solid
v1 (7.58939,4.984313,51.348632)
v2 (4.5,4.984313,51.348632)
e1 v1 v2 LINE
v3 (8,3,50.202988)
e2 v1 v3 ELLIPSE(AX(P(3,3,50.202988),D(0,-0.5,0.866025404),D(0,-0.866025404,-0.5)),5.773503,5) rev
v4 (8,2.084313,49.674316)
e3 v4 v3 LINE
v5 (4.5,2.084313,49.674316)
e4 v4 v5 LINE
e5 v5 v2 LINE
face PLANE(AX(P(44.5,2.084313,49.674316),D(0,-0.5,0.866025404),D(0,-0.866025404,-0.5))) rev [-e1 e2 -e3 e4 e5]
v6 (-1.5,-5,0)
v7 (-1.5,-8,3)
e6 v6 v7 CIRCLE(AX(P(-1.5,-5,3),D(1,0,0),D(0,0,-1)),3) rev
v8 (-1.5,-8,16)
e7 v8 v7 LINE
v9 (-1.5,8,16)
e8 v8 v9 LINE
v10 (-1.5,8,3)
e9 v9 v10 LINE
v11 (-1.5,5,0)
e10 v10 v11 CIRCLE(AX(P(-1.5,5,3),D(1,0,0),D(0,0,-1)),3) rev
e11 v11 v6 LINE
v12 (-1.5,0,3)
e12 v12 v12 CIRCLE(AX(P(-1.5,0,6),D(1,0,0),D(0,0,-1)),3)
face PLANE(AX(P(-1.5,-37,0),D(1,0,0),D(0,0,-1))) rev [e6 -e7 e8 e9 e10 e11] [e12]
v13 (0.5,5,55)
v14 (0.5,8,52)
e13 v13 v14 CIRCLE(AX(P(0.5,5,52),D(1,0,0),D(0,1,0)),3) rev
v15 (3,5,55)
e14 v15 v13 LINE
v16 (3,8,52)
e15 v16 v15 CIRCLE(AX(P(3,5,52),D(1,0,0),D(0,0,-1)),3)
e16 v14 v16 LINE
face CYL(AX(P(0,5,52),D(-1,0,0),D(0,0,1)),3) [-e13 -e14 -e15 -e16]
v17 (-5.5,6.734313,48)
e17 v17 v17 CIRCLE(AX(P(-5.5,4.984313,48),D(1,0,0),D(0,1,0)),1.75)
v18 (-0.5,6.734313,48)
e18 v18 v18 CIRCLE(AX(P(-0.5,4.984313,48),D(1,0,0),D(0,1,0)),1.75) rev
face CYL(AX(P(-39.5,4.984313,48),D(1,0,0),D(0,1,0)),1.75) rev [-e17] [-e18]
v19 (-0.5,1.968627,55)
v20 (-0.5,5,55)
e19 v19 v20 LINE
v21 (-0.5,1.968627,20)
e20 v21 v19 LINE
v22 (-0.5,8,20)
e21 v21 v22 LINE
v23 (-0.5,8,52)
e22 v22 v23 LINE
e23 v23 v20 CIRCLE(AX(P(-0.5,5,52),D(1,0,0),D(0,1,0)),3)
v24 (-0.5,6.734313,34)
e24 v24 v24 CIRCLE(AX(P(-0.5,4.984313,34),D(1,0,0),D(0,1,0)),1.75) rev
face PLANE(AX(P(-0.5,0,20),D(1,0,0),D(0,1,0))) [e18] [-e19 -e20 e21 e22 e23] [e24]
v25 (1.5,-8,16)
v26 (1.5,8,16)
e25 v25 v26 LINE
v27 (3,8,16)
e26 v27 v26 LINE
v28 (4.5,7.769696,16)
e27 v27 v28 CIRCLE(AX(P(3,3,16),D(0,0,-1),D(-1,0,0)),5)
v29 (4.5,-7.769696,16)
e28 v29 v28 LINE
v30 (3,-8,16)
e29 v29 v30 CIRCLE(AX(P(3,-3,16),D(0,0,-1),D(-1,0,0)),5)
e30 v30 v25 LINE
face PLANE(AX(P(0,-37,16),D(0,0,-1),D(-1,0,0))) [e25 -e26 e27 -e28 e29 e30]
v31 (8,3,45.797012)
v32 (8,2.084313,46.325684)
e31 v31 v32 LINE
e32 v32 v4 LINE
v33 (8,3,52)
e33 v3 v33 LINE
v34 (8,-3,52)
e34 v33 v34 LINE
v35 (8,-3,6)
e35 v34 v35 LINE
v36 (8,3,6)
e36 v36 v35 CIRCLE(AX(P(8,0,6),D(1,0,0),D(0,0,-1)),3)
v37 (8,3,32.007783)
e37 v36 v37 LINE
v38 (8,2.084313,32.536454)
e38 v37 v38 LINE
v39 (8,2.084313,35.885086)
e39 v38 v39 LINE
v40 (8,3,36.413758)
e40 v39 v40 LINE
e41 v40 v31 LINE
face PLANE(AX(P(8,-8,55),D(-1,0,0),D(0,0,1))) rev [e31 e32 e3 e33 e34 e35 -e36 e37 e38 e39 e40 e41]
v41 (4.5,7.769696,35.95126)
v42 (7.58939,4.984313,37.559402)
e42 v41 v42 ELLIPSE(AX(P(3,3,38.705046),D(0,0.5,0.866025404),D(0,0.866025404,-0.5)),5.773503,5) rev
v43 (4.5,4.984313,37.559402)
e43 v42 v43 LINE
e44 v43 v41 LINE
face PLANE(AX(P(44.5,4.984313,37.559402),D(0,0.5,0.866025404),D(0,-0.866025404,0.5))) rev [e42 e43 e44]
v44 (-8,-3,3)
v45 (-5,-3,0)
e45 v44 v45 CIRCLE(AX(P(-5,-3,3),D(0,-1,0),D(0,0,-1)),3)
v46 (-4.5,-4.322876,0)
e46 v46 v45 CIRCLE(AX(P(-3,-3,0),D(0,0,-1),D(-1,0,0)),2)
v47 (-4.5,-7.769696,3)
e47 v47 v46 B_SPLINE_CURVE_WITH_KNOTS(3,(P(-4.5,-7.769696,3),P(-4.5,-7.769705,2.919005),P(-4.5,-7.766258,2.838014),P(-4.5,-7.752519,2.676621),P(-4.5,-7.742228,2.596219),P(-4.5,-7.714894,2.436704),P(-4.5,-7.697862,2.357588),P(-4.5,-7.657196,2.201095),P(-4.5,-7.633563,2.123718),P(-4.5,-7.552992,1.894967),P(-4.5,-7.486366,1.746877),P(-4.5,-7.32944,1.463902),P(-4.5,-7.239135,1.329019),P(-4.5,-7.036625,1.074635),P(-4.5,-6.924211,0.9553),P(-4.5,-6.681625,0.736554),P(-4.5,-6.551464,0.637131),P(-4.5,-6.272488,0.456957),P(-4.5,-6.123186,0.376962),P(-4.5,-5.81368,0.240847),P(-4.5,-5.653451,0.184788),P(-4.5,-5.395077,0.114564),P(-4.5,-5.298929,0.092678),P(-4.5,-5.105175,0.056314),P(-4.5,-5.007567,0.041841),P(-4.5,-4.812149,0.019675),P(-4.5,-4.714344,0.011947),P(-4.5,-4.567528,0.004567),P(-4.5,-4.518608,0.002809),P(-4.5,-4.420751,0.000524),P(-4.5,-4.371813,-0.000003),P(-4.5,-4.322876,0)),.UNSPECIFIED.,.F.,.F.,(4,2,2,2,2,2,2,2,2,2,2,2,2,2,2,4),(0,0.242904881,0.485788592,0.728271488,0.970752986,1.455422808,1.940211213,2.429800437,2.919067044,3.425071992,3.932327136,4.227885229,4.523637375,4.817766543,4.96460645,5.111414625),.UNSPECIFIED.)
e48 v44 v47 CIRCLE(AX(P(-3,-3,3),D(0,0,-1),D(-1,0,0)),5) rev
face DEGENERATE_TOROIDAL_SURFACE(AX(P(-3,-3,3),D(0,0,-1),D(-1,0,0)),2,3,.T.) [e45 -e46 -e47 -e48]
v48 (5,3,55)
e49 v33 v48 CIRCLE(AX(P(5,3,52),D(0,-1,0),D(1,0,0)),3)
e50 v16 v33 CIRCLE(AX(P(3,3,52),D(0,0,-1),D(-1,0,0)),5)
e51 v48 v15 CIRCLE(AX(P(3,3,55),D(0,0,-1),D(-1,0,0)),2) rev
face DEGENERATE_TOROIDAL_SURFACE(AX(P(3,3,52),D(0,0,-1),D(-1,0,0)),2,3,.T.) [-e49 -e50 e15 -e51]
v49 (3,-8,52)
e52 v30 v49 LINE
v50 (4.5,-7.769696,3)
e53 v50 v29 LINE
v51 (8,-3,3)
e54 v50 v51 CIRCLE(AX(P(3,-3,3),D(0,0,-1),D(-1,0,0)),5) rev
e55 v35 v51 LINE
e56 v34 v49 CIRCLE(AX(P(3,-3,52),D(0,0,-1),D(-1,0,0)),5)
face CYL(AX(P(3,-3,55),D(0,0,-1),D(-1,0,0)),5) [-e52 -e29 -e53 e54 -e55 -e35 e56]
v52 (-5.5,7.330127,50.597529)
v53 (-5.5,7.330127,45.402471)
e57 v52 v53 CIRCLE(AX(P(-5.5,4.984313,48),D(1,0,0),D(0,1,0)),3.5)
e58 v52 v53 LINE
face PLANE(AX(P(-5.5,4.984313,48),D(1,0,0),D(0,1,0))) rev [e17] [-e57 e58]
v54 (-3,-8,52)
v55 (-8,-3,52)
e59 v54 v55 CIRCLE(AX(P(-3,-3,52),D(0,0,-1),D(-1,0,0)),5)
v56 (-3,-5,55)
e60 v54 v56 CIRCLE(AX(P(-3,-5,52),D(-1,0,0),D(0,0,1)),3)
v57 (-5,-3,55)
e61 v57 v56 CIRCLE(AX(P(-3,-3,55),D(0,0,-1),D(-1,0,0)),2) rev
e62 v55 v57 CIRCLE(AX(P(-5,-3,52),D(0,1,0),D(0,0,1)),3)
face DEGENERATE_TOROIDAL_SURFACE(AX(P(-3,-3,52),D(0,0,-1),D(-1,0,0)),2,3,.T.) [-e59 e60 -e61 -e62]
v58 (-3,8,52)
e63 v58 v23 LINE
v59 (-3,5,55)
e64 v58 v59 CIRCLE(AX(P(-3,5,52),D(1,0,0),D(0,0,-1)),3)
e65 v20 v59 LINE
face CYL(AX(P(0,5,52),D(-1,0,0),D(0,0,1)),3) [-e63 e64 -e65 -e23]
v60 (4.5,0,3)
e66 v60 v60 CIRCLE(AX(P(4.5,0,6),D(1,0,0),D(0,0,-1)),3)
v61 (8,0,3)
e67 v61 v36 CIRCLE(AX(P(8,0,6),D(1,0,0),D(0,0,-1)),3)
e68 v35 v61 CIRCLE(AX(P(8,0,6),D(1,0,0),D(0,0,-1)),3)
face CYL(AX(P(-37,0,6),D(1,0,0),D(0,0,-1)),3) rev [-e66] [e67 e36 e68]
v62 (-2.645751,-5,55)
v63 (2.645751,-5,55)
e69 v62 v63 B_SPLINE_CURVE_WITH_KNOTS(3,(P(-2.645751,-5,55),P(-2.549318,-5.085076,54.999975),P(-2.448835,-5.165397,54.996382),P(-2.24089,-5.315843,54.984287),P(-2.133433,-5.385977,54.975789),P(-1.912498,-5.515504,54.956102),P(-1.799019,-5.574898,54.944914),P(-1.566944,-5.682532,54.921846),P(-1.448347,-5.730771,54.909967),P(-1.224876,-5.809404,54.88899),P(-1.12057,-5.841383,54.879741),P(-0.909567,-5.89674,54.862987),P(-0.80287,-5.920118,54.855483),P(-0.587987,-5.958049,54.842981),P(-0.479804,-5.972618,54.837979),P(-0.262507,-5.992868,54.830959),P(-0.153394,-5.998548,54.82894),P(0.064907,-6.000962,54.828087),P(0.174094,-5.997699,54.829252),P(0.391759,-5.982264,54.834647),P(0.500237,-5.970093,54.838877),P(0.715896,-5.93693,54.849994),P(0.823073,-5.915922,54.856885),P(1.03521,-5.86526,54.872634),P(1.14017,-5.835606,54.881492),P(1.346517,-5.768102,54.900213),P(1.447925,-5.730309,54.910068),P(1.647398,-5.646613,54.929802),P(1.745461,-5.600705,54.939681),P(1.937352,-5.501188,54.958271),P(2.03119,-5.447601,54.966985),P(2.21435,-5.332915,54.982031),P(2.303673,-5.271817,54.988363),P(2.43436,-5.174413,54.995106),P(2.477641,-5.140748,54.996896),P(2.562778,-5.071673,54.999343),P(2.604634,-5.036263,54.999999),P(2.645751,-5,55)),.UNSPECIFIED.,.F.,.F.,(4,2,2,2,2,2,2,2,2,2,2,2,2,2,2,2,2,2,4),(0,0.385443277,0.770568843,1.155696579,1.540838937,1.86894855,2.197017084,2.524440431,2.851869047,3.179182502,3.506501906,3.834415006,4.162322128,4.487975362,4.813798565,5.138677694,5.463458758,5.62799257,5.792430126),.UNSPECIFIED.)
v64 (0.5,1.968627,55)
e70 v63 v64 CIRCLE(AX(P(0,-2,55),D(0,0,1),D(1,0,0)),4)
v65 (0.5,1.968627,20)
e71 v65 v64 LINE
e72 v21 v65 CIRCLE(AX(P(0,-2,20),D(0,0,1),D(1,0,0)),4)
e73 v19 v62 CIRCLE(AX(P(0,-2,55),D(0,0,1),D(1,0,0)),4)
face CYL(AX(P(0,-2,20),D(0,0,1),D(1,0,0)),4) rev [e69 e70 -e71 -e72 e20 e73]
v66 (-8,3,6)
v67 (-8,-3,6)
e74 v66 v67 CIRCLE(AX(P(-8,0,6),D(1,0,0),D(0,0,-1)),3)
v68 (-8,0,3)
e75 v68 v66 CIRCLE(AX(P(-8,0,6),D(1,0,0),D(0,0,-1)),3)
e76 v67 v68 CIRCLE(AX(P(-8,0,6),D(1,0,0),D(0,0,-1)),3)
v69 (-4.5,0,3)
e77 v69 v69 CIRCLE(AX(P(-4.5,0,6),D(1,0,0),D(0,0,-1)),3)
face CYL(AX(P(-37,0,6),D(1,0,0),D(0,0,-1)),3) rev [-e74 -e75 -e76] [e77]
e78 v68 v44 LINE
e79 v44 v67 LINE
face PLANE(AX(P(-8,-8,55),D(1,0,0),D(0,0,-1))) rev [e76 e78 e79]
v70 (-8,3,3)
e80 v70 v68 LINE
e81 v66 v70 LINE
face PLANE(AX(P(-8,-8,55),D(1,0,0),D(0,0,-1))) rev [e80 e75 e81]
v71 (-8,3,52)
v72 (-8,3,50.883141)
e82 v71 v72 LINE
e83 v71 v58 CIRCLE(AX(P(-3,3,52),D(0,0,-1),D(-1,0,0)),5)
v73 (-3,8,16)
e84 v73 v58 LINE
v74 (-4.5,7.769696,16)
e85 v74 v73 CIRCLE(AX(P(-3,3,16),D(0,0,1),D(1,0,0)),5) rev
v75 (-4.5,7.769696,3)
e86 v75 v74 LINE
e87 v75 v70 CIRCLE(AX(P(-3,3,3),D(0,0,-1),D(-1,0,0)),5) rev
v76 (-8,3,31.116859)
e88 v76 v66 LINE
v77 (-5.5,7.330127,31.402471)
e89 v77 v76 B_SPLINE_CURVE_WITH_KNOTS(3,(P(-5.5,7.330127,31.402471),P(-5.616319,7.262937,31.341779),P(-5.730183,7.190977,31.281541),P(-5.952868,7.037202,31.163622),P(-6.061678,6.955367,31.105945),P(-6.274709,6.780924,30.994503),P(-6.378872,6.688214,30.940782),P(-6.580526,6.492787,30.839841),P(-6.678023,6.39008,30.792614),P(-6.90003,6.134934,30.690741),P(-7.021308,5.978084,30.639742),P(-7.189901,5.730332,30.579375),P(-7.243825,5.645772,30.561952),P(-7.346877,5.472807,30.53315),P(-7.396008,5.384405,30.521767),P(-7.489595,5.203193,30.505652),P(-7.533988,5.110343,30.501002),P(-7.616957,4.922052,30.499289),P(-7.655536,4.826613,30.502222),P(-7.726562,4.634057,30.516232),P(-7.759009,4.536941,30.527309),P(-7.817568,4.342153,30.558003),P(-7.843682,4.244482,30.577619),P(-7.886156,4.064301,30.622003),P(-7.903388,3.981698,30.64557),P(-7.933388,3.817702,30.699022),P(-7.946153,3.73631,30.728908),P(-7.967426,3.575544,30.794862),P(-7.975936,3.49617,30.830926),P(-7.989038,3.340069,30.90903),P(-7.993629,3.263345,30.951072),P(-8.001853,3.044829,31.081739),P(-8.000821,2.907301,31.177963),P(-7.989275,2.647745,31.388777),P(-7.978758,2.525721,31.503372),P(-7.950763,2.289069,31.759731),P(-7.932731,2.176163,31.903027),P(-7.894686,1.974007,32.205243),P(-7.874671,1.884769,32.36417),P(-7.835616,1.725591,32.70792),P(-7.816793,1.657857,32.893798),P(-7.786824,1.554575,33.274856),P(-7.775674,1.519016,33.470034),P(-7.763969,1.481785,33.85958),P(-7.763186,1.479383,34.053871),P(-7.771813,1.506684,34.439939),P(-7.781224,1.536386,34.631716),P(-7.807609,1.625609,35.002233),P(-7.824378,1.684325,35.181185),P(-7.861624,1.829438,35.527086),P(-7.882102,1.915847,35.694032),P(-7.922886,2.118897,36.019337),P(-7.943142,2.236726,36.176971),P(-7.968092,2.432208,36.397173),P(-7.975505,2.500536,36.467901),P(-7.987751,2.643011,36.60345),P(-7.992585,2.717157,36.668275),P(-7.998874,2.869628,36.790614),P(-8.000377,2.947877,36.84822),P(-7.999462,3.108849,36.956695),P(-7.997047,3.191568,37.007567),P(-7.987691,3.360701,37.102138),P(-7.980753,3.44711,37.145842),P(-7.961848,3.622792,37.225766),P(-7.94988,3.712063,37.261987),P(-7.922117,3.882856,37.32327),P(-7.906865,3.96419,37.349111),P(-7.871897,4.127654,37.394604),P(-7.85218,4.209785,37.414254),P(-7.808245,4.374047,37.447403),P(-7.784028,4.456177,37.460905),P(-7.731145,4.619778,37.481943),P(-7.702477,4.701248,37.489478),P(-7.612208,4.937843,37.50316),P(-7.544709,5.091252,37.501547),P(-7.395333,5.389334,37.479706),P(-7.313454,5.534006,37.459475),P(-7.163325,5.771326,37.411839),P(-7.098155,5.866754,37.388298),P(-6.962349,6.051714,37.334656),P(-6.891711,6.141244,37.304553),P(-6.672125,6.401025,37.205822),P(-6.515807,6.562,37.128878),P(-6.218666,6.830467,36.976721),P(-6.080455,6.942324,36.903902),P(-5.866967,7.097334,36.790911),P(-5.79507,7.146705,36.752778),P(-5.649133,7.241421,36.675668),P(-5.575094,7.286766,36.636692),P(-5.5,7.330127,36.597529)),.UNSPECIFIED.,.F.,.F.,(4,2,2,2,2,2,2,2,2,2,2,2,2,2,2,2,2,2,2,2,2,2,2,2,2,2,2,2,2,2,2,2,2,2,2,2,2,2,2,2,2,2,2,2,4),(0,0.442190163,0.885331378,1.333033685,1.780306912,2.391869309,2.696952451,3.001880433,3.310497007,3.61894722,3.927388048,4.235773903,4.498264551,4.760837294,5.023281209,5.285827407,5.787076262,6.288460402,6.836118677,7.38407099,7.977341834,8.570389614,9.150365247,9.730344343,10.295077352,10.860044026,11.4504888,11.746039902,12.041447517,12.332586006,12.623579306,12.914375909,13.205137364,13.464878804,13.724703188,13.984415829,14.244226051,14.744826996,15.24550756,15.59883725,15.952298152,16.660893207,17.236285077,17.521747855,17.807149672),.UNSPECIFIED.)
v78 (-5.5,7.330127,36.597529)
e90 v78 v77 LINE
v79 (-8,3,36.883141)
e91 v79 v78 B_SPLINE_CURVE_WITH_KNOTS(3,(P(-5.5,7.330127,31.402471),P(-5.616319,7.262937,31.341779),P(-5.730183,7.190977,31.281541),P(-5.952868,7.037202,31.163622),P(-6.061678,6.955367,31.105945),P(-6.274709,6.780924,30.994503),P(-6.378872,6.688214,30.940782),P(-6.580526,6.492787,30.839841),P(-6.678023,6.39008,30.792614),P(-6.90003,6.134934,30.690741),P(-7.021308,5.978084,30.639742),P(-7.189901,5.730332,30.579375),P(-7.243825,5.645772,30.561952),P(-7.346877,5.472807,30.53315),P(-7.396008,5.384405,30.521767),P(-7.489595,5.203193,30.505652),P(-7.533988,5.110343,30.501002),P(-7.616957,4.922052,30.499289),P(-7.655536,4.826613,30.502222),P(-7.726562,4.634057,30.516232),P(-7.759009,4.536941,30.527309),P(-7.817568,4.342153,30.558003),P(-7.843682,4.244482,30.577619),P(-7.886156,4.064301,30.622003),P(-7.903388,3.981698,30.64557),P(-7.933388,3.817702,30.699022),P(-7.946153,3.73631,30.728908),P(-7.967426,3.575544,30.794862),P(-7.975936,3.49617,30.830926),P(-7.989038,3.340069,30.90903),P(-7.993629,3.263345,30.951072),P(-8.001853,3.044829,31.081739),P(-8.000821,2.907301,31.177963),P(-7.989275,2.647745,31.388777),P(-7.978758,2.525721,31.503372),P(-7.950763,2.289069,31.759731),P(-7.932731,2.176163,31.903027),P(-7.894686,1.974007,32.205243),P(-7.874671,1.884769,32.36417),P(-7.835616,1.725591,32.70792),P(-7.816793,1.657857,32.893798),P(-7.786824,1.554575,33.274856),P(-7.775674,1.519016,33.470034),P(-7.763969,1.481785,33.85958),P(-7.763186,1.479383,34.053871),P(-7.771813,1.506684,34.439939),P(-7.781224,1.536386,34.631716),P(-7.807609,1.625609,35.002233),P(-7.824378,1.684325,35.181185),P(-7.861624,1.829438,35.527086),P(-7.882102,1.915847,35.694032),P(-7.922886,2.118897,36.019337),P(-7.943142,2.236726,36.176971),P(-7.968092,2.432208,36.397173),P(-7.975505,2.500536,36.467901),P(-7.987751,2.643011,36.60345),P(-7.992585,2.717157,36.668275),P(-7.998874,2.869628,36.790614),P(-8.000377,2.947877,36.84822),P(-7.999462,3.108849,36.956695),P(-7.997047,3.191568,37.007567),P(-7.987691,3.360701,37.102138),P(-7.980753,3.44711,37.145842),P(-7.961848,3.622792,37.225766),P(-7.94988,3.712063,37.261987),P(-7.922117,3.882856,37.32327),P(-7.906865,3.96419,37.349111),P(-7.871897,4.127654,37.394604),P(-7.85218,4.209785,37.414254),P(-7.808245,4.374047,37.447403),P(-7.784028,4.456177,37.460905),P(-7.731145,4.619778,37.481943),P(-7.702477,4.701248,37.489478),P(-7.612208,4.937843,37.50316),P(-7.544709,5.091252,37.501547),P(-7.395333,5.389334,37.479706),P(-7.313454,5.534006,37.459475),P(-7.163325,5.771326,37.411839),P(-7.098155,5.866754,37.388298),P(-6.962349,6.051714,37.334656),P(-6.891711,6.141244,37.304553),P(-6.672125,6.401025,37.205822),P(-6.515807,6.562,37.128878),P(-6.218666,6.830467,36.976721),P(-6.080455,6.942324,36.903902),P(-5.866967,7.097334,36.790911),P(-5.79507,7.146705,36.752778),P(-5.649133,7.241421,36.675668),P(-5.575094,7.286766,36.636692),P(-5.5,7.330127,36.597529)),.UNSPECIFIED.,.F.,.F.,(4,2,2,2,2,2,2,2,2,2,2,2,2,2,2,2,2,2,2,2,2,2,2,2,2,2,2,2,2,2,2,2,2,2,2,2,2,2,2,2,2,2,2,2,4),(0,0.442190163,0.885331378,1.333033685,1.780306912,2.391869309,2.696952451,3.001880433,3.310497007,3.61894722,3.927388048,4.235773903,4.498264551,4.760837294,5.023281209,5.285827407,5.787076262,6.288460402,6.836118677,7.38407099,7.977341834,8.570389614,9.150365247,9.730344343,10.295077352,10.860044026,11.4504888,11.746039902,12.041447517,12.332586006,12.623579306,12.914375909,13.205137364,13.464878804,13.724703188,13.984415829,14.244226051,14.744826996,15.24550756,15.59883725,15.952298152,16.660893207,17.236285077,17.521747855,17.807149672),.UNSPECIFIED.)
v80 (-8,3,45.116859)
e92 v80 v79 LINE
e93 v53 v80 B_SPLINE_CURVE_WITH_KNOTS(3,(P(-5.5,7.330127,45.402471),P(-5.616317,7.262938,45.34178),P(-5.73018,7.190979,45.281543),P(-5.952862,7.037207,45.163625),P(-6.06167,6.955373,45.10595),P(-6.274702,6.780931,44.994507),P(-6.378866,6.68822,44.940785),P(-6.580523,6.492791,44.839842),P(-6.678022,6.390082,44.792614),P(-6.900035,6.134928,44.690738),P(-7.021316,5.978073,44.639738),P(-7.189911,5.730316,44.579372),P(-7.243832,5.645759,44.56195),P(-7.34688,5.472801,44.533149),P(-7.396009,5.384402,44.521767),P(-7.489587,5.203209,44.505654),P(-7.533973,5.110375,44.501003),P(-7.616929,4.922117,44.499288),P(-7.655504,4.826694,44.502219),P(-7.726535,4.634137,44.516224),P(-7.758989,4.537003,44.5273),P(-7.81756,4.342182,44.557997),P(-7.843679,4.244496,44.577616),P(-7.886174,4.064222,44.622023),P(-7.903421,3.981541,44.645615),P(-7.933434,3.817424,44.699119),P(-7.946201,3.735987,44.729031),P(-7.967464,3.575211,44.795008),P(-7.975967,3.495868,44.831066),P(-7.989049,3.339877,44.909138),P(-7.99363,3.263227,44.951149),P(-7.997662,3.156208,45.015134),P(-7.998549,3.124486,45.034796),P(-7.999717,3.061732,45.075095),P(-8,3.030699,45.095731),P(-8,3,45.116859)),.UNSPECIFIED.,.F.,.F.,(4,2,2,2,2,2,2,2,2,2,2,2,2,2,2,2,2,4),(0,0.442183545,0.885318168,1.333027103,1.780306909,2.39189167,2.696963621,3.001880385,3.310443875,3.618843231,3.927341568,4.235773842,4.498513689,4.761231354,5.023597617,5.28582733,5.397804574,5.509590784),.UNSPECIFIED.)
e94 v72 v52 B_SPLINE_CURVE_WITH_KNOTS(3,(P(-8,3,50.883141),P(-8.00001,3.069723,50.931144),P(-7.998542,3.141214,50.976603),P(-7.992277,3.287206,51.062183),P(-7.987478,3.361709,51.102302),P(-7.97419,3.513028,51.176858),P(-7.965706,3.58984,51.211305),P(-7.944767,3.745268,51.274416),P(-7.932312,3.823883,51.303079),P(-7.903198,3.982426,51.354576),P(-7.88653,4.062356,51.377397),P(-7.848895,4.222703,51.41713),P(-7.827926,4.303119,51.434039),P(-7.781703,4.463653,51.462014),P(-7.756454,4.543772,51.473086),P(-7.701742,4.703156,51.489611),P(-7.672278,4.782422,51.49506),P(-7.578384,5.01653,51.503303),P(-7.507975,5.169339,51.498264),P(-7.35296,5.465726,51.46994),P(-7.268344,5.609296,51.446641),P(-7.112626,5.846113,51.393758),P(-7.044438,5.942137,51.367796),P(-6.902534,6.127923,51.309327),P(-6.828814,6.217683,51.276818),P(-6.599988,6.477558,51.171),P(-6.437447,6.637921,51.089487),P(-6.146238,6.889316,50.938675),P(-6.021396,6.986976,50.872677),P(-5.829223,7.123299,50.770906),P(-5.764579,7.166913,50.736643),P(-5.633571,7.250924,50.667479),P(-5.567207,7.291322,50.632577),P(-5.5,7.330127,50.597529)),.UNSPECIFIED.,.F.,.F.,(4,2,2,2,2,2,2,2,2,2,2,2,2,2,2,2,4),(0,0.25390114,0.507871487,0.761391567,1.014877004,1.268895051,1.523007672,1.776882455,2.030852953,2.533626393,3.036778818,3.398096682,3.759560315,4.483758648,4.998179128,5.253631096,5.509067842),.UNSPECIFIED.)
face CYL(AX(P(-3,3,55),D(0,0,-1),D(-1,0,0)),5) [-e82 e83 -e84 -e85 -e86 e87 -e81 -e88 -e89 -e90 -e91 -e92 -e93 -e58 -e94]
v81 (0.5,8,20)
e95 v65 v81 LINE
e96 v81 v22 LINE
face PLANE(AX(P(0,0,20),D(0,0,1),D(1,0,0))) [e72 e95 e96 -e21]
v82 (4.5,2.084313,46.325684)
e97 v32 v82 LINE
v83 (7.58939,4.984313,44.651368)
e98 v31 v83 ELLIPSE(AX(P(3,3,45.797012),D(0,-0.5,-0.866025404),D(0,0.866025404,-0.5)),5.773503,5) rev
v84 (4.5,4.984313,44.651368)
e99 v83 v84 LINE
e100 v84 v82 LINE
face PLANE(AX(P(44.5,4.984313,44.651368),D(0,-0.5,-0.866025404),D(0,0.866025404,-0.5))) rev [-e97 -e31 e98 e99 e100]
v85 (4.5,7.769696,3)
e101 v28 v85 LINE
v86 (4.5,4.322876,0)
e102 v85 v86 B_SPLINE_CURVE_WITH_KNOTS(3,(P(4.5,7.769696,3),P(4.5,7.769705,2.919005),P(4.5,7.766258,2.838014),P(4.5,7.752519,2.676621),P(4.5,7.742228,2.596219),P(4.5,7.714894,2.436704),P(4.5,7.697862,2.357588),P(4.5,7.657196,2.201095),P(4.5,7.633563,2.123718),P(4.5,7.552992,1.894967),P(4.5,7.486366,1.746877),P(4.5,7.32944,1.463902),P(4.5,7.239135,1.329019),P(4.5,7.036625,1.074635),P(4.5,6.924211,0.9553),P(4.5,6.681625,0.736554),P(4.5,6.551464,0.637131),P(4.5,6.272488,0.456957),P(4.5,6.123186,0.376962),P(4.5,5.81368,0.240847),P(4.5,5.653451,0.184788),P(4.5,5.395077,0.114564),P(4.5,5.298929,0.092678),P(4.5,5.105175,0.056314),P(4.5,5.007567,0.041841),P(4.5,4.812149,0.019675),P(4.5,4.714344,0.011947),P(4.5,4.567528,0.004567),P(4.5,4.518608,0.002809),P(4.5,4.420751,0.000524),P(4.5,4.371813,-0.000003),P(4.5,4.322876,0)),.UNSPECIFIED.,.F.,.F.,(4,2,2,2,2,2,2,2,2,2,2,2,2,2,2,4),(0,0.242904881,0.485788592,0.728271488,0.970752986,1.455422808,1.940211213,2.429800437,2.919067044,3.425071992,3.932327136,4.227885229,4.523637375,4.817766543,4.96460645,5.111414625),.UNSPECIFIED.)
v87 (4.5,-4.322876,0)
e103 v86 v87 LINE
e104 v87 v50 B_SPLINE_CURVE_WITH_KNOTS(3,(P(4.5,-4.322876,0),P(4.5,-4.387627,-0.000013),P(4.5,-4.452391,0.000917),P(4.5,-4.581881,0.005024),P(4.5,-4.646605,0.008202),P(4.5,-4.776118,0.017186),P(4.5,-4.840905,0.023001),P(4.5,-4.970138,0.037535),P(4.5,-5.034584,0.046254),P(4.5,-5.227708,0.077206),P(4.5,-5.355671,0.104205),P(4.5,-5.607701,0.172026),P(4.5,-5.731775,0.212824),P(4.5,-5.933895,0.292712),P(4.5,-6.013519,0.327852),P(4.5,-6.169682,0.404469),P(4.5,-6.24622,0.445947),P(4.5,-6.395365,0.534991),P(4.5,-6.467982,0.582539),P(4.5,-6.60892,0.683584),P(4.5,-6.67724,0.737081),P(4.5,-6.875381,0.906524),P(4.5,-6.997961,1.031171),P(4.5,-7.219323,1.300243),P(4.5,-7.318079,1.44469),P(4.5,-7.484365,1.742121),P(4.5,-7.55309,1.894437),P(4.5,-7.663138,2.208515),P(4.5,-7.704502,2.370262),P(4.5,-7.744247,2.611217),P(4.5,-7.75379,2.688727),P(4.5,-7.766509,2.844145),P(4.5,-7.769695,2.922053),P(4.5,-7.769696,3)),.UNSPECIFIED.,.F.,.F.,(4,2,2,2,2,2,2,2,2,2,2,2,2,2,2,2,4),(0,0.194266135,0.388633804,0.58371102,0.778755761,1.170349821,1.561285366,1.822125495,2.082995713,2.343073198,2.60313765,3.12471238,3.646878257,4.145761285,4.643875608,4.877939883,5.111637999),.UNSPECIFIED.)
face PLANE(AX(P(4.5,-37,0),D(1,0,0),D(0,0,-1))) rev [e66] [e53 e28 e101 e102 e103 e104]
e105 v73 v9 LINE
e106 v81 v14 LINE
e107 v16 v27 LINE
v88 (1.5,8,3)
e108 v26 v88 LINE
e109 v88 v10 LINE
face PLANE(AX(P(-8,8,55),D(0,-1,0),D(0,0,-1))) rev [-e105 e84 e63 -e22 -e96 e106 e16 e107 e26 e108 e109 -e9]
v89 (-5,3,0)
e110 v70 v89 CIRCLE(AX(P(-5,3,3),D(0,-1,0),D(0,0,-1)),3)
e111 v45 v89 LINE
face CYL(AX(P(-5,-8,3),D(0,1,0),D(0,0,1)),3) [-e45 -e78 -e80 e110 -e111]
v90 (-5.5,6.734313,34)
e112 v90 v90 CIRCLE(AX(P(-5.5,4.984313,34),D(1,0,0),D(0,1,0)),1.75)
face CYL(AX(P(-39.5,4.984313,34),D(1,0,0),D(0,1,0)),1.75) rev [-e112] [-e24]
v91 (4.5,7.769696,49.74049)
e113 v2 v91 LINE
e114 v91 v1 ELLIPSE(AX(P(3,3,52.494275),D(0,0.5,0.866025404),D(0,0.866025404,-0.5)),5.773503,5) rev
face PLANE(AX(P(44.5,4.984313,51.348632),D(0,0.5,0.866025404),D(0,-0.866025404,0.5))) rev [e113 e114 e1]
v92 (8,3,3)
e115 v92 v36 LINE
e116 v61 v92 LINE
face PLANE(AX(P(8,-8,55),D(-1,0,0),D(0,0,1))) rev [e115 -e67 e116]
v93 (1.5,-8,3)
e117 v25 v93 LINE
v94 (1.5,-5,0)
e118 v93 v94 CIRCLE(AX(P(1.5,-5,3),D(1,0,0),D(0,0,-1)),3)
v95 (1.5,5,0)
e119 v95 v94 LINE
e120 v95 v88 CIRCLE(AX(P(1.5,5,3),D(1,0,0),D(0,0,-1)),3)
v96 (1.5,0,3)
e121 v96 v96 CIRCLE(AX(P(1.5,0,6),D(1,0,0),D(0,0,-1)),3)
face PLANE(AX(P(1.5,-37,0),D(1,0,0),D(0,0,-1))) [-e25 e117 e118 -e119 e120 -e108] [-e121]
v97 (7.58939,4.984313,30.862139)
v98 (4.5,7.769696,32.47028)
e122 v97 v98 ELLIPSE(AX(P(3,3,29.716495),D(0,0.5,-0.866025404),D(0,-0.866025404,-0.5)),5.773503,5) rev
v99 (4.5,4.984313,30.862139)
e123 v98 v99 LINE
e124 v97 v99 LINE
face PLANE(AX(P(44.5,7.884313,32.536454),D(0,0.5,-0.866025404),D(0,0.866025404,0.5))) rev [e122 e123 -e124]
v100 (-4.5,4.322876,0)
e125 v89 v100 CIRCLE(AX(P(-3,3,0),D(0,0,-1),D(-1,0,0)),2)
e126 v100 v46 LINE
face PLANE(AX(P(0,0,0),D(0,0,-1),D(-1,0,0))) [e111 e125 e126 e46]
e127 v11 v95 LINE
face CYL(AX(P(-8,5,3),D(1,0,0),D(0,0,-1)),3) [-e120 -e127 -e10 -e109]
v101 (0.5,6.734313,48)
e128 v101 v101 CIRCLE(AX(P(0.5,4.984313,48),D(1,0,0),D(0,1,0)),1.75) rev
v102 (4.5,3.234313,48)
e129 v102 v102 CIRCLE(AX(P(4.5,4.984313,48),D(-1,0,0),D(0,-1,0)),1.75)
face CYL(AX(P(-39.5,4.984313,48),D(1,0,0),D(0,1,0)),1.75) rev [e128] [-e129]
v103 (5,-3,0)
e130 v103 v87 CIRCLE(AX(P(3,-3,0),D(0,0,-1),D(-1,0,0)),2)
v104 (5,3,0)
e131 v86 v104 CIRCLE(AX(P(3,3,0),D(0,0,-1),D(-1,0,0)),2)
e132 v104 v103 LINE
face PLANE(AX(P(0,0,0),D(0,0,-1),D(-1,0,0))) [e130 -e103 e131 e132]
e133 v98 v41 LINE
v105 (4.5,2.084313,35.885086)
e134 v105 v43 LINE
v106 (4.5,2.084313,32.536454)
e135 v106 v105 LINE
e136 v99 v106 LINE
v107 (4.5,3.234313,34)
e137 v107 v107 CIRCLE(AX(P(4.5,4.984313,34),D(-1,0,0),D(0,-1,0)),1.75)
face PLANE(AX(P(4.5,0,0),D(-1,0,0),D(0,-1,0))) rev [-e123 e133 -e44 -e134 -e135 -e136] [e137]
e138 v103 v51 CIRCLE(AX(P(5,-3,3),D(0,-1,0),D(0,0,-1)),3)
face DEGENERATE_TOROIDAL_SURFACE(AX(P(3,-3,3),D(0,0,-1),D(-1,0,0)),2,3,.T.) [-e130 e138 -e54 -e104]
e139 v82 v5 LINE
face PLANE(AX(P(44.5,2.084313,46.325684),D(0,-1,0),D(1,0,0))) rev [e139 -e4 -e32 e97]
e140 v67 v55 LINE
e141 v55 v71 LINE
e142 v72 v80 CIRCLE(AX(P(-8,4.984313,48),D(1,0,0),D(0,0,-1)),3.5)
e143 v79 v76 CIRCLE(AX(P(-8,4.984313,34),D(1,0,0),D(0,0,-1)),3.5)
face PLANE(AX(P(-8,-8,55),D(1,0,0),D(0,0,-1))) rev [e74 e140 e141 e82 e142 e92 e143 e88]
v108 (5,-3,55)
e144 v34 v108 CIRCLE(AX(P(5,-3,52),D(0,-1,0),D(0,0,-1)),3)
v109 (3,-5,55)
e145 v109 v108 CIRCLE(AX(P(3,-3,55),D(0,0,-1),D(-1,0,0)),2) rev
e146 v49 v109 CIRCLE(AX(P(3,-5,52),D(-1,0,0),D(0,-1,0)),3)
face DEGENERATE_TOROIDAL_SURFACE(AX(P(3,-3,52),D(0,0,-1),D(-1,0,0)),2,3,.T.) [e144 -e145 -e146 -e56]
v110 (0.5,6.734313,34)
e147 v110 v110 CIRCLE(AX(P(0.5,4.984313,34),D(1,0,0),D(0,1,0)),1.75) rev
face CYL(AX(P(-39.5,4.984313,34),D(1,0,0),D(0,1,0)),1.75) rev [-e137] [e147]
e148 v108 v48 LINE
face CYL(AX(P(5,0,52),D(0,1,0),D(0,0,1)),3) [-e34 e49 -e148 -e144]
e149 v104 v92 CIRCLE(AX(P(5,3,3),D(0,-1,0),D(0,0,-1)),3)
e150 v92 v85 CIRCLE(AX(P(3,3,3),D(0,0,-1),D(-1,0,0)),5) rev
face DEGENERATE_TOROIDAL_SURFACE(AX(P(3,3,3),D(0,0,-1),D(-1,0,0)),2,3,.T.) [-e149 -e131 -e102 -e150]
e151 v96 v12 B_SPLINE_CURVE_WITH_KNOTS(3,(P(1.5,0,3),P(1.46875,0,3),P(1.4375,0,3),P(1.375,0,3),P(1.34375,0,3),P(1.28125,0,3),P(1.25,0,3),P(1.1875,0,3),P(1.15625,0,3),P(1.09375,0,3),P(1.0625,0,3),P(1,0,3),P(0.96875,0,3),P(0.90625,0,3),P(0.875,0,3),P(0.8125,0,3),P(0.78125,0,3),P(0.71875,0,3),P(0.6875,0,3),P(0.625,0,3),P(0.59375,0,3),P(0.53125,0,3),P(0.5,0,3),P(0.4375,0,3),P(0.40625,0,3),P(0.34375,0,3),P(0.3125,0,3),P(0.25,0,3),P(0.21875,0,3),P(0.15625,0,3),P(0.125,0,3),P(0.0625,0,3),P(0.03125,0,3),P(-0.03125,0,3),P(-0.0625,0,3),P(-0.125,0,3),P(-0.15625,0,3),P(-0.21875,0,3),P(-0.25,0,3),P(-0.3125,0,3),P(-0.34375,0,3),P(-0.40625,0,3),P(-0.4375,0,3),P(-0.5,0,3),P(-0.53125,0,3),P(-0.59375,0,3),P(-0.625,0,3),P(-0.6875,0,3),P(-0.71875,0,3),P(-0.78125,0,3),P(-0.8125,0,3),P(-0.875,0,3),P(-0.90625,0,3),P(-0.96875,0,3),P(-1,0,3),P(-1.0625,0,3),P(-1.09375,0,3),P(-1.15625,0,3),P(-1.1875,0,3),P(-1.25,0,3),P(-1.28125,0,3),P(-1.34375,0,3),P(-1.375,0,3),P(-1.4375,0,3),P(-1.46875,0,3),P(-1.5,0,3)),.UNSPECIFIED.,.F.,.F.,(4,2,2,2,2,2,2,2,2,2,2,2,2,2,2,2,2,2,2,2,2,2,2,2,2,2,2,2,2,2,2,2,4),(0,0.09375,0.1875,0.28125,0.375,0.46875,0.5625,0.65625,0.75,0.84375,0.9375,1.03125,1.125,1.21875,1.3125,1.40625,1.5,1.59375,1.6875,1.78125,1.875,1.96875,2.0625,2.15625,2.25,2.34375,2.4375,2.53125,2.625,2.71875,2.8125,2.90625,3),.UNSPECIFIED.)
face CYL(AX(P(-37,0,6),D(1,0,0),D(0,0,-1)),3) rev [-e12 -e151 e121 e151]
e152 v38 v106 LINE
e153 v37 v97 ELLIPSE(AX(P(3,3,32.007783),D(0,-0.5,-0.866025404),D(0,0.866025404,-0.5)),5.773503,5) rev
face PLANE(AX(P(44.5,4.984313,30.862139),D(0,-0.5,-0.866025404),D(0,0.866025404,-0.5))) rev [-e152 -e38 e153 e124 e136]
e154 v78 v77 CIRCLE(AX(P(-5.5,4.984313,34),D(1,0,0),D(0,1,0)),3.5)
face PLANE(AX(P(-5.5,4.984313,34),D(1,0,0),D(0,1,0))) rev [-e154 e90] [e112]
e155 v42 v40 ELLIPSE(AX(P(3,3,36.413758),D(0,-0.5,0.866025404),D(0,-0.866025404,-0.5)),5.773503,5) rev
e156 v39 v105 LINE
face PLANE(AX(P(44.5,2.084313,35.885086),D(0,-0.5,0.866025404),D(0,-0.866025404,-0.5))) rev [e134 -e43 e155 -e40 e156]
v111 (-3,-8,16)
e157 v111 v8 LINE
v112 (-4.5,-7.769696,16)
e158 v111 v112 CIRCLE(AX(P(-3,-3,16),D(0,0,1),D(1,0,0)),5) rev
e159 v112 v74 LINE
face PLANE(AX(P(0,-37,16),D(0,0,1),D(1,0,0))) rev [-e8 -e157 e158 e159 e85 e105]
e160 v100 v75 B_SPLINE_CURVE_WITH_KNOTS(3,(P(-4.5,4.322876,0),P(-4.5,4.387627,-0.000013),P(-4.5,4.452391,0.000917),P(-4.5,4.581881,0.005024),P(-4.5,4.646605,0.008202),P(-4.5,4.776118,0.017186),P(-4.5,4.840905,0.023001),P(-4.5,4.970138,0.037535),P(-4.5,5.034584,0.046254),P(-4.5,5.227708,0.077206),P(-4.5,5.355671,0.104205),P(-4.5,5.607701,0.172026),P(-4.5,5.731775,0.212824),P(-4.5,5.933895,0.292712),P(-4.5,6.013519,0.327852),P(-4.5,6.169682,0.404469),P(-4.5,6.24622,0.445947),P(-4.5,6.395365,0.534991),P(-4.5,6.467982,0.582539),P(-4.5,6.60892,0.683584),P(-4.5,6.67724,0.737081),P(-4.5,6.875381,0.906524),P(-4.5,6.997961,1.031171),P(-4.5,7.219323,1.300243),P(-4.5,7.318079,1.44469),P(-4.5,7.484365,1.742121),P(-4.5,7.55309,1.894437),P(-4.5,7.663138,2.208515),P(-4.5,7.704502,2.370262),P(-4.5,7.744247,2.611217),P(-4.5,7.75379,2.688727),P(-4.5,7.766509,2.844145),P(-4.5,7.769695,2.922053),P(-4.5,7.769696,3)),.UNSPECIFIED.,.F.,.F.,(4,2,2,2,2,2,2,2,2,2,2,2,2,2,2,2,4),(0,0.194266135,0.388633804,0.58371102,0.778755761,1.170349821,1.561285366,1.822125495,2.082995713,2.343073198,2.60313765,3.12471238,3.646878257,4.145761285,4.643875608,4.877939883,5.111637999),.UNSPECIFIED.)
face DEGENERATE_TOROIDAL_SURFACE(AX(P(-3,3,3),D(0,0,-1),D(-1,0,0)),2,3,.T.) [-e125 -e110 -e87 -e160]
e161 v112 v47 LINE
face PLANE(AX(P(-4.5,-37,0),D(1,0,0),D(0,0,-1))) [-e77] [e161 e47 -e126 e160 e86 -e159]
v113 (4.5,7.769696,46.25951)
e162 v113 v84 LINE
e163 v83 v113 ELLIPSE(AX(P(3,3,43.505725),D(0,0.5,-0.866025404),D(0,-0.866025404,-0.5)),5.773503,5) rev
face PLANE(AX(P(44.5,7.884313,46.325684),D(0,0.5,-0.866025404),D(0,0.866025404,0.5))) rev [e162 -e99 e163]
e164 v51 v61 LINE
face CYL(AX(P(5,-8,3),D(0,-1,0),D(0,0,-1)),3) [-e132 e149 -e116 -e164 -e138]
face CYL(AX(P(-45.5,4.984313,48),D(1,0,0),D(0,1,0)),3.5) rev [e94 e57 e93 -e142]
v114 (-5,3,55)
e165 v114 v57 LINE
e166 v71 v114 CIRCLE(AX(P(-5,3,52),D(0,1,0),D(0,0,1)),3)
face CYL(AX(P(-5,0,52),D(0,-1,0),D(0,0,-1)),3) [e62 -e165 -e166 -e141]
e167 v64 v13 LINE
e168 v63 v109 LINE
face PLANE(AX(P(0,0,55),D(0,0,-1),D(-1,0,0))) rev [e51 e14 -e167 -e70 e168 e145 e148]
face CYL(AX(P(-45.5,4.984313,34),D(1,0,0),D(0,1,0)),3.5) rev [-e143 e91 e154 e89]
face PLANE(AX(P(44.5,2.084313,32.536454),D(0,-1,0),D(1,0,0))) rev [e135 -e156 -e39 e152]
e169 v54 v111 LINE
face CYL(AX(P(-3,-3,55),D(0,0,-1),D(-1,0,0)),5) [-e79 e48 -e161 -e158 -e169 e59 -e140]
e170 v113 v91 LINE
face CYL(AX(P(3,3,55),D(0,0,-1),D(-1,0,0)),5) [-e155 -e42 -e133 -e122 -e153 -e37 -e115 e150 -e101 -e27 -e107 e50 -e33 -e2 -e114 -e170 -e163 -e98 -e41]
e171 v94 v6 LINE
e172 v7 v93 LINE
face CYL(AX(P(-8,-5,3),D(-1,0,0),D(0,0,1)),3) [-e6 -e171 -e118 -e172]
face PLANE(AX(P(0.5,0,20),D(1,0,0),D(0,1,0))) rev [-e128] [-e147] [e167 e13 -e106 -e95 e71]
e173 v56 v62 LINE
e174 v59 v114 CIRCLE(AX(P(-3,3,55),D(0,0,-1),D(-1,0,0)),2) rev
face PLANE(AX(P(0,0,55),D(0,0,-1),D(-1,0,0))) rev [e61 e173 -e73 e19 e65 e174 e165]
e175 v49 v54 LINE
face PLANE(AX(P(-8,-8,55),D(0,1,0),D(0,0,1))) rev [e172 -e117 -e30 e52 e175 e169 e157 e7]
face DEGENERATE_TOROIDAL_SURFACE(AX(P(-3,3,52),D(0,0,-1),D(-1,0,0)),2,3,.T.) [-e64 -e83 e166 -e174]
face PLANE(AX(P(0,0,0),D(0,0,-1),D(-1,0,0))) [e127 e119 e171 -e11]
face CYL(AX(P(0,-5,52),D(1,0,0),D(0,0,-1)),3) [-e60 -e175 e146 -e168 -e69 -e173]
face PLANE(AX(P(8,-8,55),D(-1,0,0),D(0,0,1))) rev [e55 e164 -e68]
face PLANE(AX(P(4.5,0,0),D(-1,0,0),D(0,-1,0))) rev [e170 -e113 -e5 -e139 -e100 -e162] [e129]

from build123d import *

# Parameters (mm, degrees)
SKETCH1_W               = 16
SKETCH1_H               = 16
BOSS_EXTRUDE1_DEPTH     = 55
SKETCH2_W               = 3
SKETCH2_H               = 16
CUT_EXTRUDE1_DEPTH      = 45
SKETCH3_R               = 3
CUT_EXTRUDE2_DEPTH      = 45
CUT_EXTRUDE3_DEPTH      = 35
FILLET1_R               = 5
FILLET2_R               = 3
CUT_EXTRUDE4_DEPTH      = 40
CUT_EXTRUDE4_DEPTH_BACK = 40
SKETCH5_R               = 1.75
CUT_EXTRUDE5_START      = -4
CUT_EXTRUDE5_DEPTH      = 40
CUT_EXTRUDE6_START      = -5
SKETCH7_R               = 3.5
CUT_EXTRUDE6_DEPTH      = 40


# Some blends are built 0.0001 mm under size
with BuildPart() as part:
    # Sketch1 → Boss-Extrude1 (new body)
    with BuildSketch(Plane.XY):
        Rectangle(SKETCH1_W, SKETCH1_H)
    extrude(amount=BOSS_EXTRUDE1_DEPTH)

    # Sketch2 → Cut-Extrude1 (cut)
    with BuildSketch(Plane(origin=(0, 8, 0), x_dir=(1, 0, 0), z_dir=(0, 1, 0))):
        with Locations((3, -8)):
            Rectangle(SKETCH2_W, SKETCH2_H)
        with Locations((-3, -8)):
            Rectangle(SKETCH2_W, SKETCH2_H)
    extrude(amount=-CUT_EXTRUDE1_DEPTH, mode=Mode.SUBTRACT)

    # Sketch3 → Cut-Extrude2 (cut)
    with BuildSketch(Plane(origin=(8, 0, 0), x_dir=(0, 0, -1), z_dir=(1, 0, 0))):
        with Locations((-6, 0)):
            Circle(SKETCH3_R)
    extrude(amount=-CUT_EXTRUDE2_DEPTH, mode=Mode.SUBTRACT)

    # Sketch4 → Cut-Extrude3 (cut)
    with BuildSketch(Plane.XY.offset(55)):
        with BuildLine():
            Line((0.5, 1.968626967), (0.5, 0.424558432))
            Line((0.5, 0.424558432), (-0.5, 0.424558432))
            Line((-0.5, 0.424558432), (-0.5, 1.968626967))
            ThreePointArc((-0.5, 1.968626967), (-2.645751311, -5), (4, -2))
            ThreePointArc((4, -2), (3, 0.645751311), (0.5, 1.968626967))
        make_face()
        with BuildLine():
            Line((-0.5, 0.424558432), (0.5, 0.424558432))
            Line((0.5, 0.424558432), (0.5, 1.968626967))
            ThreePointArc((0.5, 1.968626967), (0, 2), (-0.5, 1.968626967))
            Line((-0.5, 1.968626967), (-0.5, 0.424558432))
        make_face()
        with BuildLine():
            ThreePointArc((-0.5, 1.968626967), (0, 2), (0.5, 1.968626967))
            Line((0.5, 1.968626967), (0.5, 8))
            Line((0.5, 8), (-0.5, 8))
            Line((-0.5, 8), (-0.5, 1.968626967))
        make_face()
    extrude(amount=-CUT_EXTRUDE3_DEPTH, mode=Mode.SUBTRACT)

    # Fillet1
    fillet1_edges = [part.edges().sort_by_distance(p)[0] for p in [
        (8, 8, 27.5),
        (-8, 8, 27.5),
        (8, -8, 27.5),
        (-8, -8, 27.5),
    ]]
    fillet(fillet1_edges, radius=FILLET1_R - 0.0001)  # a hair under: the kernel refuses the full size

    # Fillet2
    # the kernel refuses this fillet: 3 mm, written as the material it takes off along each edge
    with BuildSketch(Plane(origin=(9, 8, 0), x_dir=(0, -1, 0), z_dir=(-1, 0, 0))) as fillet2_piece_1:
        with BuildLine():
            CenterArc((FILLET2_R, FILLET2_R), FILLET2_R, 180, 90)
            Line((0, FILLET2_R), (0, 0))
            Line((0, 0), (FILLET2_R, 0))
        make_face()
    extrude(amount=18, mode=Mode.SUBTRACT)
    with BuildSketch(Plane(origin=(-9, -8, 0), x_dir=(0, 0, 1), z_dir=(1, 0, 0))) as fillet2_piece_2:
        with BuildLine():
            CenterArc((FILLET2_R, -FILLET2_R), FILLET2_R, 90, 90)
            Line((0, -FILLET2_R), (0, 0))
            Line((0, 0), (FILLET2_R, 0))
        make_face()
    extrude(amount=18, mode=Mode.SUBTRACT)
    with BuildSketch(Plane(origin=(7, 8, 55), x_dir=(0, -1, 0), z_dir=(-1, 0, 0)), Plane(origin=(3.0001, 8, 55), x_dir=(0, -1, 0), z_dir=(-1, 0, 0))) as fillet2_piece_3:
        with BuildLine():
            CenterArc((FILLET2_R, -FILLET2_R), FILLET2_R, 90, 90)
            Line((0, -FILLET2_R), (0, 0))
            Line((0, 0), (FILLET2_R, 0))
        make_face()
    extrude(amount=10.0001, mode=Mode.SUBTRACT)
    with BuildSketch(Plane(origin=(8, -3.0001, 0), x_dir=(0, 0, 1), z_dir=(0, 1, 0)), Plane(origin=(8, -3.0001, 55), x_dir=(-1, 0, 0), z_dir=(0, 1, 0)), Plane(origin=(-8, 3.0001, 55), x_dir=(1, 0, 0), z_dir=(0, -1, 0))) as fillet2_piece_4:
        with BuildLine():
            CenterArc((FILLET2_R, -FILLET2_R), FILLET2_R, 90, 90)
            Line((0, -FILLET2_R), (0, 0))
            Line((0, 0), (FILLET2_R, 0))
        make_face()
    extrude(amount=6.0002, mode=Mode.SUBTRACT)
    with BuildSketch(Plane(origin=(3.0001, -3.0001, 0), x_dir=(-0.9304882617806061, -0.36632170927820573, 0), z_dir=(-0.36632170927820573, 0.9304882617806061, 0))) as fillet2_piece_5_section:
        with BuildLine():
            CenterArc((4.9999 - FILLET2_R, FILLET2_R), FILLET2_R, 270, 90)
            Line((4.9999 - FILLET2_R, 0), (4.9999, 0))
            Line((4.9999, 0), (4.9999, FILLET2_R))
        make_face()
    fillet2_piece_5 = revolve(axis=Axis((3.0001, -3.0001, 0), (0, 0, 1)), revolution_arc=158.511054393, mode=Mode.PRIVATE)
    fillet2_piece_5 = split(fillet2_piece_5, bisect_by=Plane(origin=(4.5, -5.386535126, 0.726343335), z_dir=(1, 0, 0)), keep=Keep.TOP, mode=Mode.PRIVATE)
    add(fillet2_piece_5, mode=Mode.SUBTRACT)
    with BuildSketch(Plane(origin=(3.0001, 3.0001, 0), x_dir=(1, 0, 0), z_dir=(0, -1, 0))) as fillet2_piece_6_section:
        with BuildLine():
            CenterArc((4.9999 - FILLET2_R, FILLET2_R), FILLET2_R, 270, 90)
            Line((4.9999 - FILLET2_R, 0), (4.9999, 0))
            Line((4.9999, 0), (4.9999, FILLET2_R))
        make_face()
    fillet2_piece_6 = revolve(axis=Axis((3.0001, 3.0001, 0), (0, 0, 1)), revolution_arc=158.511054393, mode=Mode.PRIVATE)
    fillet2_piece_6 = split(fillet2_piece_6, bisect_by=Plane(origin=(4.5, 5.386535107, 0.726343714), z_dir=(1, 0, 0)), keep=Keep.TOP, mode=Mode.PRIVATE)
    add(fillet2_piece_6, mode=Mode.SUBTRACT)
    with BuildSketch(Plane(origin=(-3.0001, -8, 55), x_dir=(0, 0, -1), z_dir=(1, 0, 0)), Plane(origin=(-8, 3.0001, 0), x_dir=(1, 0, 0), z_dir=(0, -1, 0))) as fillet2_piece_7:
        with BuildLine():
            CenterArc((FILLET2_R, FILLET2_R), FILLET2_R, 180, 90)
            Line((0, FILLET2_R), (0, 0))
            Line((0, 0), (FILLET2_R, 0))
        make_face()
    extrude(amount=6.0002, mode=Mode.SUBTRACT)
    with BuildSketch(Plane(origin=(-3.0001, -3.0001, 55), x_dir=(0, -1, 0), z_dir=(1, 0, 0))) as fillet2_piece_8:
        with BuildLine():
            CenterArc((4.9999 - FILLET2_R, FILLET2_R), FILLET2_R, 270, 90)
            Line((4.9999 - FILLET2_R, 0), (4.9999, 0))
            Line((4.9999, 0), (4.9999, FILLET2_R))
        make_face()
    revolve(axis=Axis((-3.0001, -3.0001, 55), (0, 0, -1)), revolution_arc=90, mode=Mode.SUBTRACT)
    with BuildSketch(Plane(origin=(3.0001, -3.0001, 55), x_dir=(0, -1, 0), z_dir=(-1, 0, 0))) as fillet2_piece_9:
        with BuildLine():
            CenterArc((4.9999 - FILLET2_R, -FILLET2_R), FILLET2_R, 0, 90)
            Line((4.9999, -FILLET2_R), (4.9999, 0))
            Line((4.9999, 0), (4.9999 - FILLET2_R, 0))
        make_face()
    revolve(axis=Axis((3.0001, -3.0001, 55), (0, 0, 1)), revolution_arc=90, mode=Mode.SUBTRACT)
    with BuildSketch(Plane(origin=(-3.0001, 3.0001, 55), x_dir=(-1, 0, 0), z_dir=(0, -1, 0))) as fillet2_piece_10:
        with BuildLine():
            CenterArc((4.9999 - FILLET2_R, FILLET2_R), FILLET2_R, 270, 90)
            Line((4.9999, FILLET2_R), (4.9999, 0))
            Line((4.9999, 0), (4.9999 - FILLET2_R, 0))
        make_face()
    revolve(axis=Axis((-3.0001, 3.0001, 55), (0, 0, -1)), revolution_arc=90, mode=Mode.SUBTRACT)
    with BuildSketch(Plane(origin=(3.0001, 3.0001, 55), x_dir=(1, 0, 0), z_dir=(0, -1, 0))) as fillet2_piece_11:
        with BuildLine():
            CenterArc((4.9999 - FILLET2_R, -FILLET2_R), FILLET2_R, 0, 90)
            Line((4.9999, -FILLET2_R), (4.9999, 0))
            Line((4.9999, 0), (4.9999 - FILLET2_R, 0))
        make_face()
    revolve(axis=Axis((3.0001, 3.0001, 55), (0, 0, 1)), revolution_arc=90, mode=Mode.SUBTRACT)
    with BuildSketch(Plane(origin=(-3.0001, -3.0001, 0), x_dir=(0.9304882617806057, -0.3663217092782066, 0), z_dir=(0.3663217092782066, 0.9304882617806057, 0))) as fillet2_piece_12_section:
        with BuildLine():
            CenterArc((4.9999 - FILLET2_R, -FILLET2_R), FILLET2_R, 0, 90)
            Line((4.9999 - FILLET2_R, 0), (4.9999, 0))
            Line((4.9999, 0), (4.9999, -FILLET2_R))
        make_face()
    fillet2_piece_12 = revolve(axis=Axis((-3.0001, -3.0001, 0), (0, 0, -1)), revolution_arc=158.511054393, mode=Mode.PRIVATE)
    fillet2_piece_12 = split(fillet2_piece_12, bisect_by=Plane(origin=(-4.5, -5.38653512, 0.72634326), z_dir=(-1, 0, 0)), keep=Keep.TOP, mode=Mode.PRIVATE)
    add(fillet2_piece_12, mode=Mode.SUBTRACT)
    with BuildSketch(Plane(origin=(-3.0001, 3.0001, 0), x_dir=(-1, 0, 0), z_dir=(0, -1, 0))) as fillet2_piece_13_section:
        with BuildLine():
            CenterArc((4.9999 - FILLET2_R, -FILLET2_R), FILLET2_R, 0, 90)
            Line((4.9999 - FILLET2_R, 0), (4.9999, 0))
            Line((4.9999, 0), (4.9999, -FILLET2_R))
        make_face()
    fillet2_piece_13 = revolve(axis=Axis((-3.0001, 3.0001, 0), (0, 0, -1)), revolution_arc=158.511054393, mode=Mode.PRIVATE)
    fillet2_piece_13 = split(fillet2_piece_13, bisect_by=Plane(origin=(-4.5, 5.386535101, 0.726343639), z_dir=(-1, 0, 0)), keep=Keep.TOP, mode=Mode.PRIVATE)
    add(fillet2_piece_13, mode=Mode.SUBTRACT)

    # Sketch5 → Cut-Extrude4 (cut, two sides: drawn at the far end of the back side and taken through both)
    with BuildSketch(Plane.ZY.offset(-0.5).offset(-CUT_EXTRUDE4_DEPTH_BACK)):
        with Locations(Location((48, 4.984313483, 0), (0, 0, 90))):
            Circle(SKETCH5_R)
        with Locations(Location((34, 4.984313483, 0), (0, 0, 90))):
            Circle(SKETCH5_R)
    extrude(amount=CUT_EXTRUDE4_DEPTH + CUT_EXTRUDE4_DEPTH_BACK, mode=Mode.SUBTRACT)

    # Sketch6 → Cut-Extrude5 (cut)
    with BuildSketch(Plane.ZY.offset(-0.5).offset(CUT_EXTRUDE5_START)):
        Polygon((49.674315781, 7.884313483), (46.325684219, 7.884313483), (44.651368439, 4.984313483), (46.325684219, 2.084313483), (49.674315781, 2.084313483), (51.348631561, 4.984313483), align=None)
        Polygon((35.885086056, 7.884313483), (32.536454495, 7.884313483), (30.862138714, 4.984313483), (32.536454495, 2.084313483), (35.885086056, 2.084313483), (37.559401836, 4.984313483), align=None)
    extrude(amount=-CUT_EXTRUDE5_DEPTH, mode=Mode.SUBTRACT)

    # Sketch7 → Cut-Extrude6 (cut)
    with BuildSketch(Plane(origin=(-0.5, 0, 0), x_dir=(0, 0, -1), z_dir=(1, 0, 0)).offset(CUT_EXTRUDE6_START)):
        with Locations((-48, 4.984313483)):
            Circle(SKETCH7_R)
        with Locations((-34, 4.984313483)):
            Circle(SKETCH7_R)
    extrude(amount=-CUT_EXTRUDE6_DEPTH, mode=Mode.SUBTRACT)


solid = part.part
